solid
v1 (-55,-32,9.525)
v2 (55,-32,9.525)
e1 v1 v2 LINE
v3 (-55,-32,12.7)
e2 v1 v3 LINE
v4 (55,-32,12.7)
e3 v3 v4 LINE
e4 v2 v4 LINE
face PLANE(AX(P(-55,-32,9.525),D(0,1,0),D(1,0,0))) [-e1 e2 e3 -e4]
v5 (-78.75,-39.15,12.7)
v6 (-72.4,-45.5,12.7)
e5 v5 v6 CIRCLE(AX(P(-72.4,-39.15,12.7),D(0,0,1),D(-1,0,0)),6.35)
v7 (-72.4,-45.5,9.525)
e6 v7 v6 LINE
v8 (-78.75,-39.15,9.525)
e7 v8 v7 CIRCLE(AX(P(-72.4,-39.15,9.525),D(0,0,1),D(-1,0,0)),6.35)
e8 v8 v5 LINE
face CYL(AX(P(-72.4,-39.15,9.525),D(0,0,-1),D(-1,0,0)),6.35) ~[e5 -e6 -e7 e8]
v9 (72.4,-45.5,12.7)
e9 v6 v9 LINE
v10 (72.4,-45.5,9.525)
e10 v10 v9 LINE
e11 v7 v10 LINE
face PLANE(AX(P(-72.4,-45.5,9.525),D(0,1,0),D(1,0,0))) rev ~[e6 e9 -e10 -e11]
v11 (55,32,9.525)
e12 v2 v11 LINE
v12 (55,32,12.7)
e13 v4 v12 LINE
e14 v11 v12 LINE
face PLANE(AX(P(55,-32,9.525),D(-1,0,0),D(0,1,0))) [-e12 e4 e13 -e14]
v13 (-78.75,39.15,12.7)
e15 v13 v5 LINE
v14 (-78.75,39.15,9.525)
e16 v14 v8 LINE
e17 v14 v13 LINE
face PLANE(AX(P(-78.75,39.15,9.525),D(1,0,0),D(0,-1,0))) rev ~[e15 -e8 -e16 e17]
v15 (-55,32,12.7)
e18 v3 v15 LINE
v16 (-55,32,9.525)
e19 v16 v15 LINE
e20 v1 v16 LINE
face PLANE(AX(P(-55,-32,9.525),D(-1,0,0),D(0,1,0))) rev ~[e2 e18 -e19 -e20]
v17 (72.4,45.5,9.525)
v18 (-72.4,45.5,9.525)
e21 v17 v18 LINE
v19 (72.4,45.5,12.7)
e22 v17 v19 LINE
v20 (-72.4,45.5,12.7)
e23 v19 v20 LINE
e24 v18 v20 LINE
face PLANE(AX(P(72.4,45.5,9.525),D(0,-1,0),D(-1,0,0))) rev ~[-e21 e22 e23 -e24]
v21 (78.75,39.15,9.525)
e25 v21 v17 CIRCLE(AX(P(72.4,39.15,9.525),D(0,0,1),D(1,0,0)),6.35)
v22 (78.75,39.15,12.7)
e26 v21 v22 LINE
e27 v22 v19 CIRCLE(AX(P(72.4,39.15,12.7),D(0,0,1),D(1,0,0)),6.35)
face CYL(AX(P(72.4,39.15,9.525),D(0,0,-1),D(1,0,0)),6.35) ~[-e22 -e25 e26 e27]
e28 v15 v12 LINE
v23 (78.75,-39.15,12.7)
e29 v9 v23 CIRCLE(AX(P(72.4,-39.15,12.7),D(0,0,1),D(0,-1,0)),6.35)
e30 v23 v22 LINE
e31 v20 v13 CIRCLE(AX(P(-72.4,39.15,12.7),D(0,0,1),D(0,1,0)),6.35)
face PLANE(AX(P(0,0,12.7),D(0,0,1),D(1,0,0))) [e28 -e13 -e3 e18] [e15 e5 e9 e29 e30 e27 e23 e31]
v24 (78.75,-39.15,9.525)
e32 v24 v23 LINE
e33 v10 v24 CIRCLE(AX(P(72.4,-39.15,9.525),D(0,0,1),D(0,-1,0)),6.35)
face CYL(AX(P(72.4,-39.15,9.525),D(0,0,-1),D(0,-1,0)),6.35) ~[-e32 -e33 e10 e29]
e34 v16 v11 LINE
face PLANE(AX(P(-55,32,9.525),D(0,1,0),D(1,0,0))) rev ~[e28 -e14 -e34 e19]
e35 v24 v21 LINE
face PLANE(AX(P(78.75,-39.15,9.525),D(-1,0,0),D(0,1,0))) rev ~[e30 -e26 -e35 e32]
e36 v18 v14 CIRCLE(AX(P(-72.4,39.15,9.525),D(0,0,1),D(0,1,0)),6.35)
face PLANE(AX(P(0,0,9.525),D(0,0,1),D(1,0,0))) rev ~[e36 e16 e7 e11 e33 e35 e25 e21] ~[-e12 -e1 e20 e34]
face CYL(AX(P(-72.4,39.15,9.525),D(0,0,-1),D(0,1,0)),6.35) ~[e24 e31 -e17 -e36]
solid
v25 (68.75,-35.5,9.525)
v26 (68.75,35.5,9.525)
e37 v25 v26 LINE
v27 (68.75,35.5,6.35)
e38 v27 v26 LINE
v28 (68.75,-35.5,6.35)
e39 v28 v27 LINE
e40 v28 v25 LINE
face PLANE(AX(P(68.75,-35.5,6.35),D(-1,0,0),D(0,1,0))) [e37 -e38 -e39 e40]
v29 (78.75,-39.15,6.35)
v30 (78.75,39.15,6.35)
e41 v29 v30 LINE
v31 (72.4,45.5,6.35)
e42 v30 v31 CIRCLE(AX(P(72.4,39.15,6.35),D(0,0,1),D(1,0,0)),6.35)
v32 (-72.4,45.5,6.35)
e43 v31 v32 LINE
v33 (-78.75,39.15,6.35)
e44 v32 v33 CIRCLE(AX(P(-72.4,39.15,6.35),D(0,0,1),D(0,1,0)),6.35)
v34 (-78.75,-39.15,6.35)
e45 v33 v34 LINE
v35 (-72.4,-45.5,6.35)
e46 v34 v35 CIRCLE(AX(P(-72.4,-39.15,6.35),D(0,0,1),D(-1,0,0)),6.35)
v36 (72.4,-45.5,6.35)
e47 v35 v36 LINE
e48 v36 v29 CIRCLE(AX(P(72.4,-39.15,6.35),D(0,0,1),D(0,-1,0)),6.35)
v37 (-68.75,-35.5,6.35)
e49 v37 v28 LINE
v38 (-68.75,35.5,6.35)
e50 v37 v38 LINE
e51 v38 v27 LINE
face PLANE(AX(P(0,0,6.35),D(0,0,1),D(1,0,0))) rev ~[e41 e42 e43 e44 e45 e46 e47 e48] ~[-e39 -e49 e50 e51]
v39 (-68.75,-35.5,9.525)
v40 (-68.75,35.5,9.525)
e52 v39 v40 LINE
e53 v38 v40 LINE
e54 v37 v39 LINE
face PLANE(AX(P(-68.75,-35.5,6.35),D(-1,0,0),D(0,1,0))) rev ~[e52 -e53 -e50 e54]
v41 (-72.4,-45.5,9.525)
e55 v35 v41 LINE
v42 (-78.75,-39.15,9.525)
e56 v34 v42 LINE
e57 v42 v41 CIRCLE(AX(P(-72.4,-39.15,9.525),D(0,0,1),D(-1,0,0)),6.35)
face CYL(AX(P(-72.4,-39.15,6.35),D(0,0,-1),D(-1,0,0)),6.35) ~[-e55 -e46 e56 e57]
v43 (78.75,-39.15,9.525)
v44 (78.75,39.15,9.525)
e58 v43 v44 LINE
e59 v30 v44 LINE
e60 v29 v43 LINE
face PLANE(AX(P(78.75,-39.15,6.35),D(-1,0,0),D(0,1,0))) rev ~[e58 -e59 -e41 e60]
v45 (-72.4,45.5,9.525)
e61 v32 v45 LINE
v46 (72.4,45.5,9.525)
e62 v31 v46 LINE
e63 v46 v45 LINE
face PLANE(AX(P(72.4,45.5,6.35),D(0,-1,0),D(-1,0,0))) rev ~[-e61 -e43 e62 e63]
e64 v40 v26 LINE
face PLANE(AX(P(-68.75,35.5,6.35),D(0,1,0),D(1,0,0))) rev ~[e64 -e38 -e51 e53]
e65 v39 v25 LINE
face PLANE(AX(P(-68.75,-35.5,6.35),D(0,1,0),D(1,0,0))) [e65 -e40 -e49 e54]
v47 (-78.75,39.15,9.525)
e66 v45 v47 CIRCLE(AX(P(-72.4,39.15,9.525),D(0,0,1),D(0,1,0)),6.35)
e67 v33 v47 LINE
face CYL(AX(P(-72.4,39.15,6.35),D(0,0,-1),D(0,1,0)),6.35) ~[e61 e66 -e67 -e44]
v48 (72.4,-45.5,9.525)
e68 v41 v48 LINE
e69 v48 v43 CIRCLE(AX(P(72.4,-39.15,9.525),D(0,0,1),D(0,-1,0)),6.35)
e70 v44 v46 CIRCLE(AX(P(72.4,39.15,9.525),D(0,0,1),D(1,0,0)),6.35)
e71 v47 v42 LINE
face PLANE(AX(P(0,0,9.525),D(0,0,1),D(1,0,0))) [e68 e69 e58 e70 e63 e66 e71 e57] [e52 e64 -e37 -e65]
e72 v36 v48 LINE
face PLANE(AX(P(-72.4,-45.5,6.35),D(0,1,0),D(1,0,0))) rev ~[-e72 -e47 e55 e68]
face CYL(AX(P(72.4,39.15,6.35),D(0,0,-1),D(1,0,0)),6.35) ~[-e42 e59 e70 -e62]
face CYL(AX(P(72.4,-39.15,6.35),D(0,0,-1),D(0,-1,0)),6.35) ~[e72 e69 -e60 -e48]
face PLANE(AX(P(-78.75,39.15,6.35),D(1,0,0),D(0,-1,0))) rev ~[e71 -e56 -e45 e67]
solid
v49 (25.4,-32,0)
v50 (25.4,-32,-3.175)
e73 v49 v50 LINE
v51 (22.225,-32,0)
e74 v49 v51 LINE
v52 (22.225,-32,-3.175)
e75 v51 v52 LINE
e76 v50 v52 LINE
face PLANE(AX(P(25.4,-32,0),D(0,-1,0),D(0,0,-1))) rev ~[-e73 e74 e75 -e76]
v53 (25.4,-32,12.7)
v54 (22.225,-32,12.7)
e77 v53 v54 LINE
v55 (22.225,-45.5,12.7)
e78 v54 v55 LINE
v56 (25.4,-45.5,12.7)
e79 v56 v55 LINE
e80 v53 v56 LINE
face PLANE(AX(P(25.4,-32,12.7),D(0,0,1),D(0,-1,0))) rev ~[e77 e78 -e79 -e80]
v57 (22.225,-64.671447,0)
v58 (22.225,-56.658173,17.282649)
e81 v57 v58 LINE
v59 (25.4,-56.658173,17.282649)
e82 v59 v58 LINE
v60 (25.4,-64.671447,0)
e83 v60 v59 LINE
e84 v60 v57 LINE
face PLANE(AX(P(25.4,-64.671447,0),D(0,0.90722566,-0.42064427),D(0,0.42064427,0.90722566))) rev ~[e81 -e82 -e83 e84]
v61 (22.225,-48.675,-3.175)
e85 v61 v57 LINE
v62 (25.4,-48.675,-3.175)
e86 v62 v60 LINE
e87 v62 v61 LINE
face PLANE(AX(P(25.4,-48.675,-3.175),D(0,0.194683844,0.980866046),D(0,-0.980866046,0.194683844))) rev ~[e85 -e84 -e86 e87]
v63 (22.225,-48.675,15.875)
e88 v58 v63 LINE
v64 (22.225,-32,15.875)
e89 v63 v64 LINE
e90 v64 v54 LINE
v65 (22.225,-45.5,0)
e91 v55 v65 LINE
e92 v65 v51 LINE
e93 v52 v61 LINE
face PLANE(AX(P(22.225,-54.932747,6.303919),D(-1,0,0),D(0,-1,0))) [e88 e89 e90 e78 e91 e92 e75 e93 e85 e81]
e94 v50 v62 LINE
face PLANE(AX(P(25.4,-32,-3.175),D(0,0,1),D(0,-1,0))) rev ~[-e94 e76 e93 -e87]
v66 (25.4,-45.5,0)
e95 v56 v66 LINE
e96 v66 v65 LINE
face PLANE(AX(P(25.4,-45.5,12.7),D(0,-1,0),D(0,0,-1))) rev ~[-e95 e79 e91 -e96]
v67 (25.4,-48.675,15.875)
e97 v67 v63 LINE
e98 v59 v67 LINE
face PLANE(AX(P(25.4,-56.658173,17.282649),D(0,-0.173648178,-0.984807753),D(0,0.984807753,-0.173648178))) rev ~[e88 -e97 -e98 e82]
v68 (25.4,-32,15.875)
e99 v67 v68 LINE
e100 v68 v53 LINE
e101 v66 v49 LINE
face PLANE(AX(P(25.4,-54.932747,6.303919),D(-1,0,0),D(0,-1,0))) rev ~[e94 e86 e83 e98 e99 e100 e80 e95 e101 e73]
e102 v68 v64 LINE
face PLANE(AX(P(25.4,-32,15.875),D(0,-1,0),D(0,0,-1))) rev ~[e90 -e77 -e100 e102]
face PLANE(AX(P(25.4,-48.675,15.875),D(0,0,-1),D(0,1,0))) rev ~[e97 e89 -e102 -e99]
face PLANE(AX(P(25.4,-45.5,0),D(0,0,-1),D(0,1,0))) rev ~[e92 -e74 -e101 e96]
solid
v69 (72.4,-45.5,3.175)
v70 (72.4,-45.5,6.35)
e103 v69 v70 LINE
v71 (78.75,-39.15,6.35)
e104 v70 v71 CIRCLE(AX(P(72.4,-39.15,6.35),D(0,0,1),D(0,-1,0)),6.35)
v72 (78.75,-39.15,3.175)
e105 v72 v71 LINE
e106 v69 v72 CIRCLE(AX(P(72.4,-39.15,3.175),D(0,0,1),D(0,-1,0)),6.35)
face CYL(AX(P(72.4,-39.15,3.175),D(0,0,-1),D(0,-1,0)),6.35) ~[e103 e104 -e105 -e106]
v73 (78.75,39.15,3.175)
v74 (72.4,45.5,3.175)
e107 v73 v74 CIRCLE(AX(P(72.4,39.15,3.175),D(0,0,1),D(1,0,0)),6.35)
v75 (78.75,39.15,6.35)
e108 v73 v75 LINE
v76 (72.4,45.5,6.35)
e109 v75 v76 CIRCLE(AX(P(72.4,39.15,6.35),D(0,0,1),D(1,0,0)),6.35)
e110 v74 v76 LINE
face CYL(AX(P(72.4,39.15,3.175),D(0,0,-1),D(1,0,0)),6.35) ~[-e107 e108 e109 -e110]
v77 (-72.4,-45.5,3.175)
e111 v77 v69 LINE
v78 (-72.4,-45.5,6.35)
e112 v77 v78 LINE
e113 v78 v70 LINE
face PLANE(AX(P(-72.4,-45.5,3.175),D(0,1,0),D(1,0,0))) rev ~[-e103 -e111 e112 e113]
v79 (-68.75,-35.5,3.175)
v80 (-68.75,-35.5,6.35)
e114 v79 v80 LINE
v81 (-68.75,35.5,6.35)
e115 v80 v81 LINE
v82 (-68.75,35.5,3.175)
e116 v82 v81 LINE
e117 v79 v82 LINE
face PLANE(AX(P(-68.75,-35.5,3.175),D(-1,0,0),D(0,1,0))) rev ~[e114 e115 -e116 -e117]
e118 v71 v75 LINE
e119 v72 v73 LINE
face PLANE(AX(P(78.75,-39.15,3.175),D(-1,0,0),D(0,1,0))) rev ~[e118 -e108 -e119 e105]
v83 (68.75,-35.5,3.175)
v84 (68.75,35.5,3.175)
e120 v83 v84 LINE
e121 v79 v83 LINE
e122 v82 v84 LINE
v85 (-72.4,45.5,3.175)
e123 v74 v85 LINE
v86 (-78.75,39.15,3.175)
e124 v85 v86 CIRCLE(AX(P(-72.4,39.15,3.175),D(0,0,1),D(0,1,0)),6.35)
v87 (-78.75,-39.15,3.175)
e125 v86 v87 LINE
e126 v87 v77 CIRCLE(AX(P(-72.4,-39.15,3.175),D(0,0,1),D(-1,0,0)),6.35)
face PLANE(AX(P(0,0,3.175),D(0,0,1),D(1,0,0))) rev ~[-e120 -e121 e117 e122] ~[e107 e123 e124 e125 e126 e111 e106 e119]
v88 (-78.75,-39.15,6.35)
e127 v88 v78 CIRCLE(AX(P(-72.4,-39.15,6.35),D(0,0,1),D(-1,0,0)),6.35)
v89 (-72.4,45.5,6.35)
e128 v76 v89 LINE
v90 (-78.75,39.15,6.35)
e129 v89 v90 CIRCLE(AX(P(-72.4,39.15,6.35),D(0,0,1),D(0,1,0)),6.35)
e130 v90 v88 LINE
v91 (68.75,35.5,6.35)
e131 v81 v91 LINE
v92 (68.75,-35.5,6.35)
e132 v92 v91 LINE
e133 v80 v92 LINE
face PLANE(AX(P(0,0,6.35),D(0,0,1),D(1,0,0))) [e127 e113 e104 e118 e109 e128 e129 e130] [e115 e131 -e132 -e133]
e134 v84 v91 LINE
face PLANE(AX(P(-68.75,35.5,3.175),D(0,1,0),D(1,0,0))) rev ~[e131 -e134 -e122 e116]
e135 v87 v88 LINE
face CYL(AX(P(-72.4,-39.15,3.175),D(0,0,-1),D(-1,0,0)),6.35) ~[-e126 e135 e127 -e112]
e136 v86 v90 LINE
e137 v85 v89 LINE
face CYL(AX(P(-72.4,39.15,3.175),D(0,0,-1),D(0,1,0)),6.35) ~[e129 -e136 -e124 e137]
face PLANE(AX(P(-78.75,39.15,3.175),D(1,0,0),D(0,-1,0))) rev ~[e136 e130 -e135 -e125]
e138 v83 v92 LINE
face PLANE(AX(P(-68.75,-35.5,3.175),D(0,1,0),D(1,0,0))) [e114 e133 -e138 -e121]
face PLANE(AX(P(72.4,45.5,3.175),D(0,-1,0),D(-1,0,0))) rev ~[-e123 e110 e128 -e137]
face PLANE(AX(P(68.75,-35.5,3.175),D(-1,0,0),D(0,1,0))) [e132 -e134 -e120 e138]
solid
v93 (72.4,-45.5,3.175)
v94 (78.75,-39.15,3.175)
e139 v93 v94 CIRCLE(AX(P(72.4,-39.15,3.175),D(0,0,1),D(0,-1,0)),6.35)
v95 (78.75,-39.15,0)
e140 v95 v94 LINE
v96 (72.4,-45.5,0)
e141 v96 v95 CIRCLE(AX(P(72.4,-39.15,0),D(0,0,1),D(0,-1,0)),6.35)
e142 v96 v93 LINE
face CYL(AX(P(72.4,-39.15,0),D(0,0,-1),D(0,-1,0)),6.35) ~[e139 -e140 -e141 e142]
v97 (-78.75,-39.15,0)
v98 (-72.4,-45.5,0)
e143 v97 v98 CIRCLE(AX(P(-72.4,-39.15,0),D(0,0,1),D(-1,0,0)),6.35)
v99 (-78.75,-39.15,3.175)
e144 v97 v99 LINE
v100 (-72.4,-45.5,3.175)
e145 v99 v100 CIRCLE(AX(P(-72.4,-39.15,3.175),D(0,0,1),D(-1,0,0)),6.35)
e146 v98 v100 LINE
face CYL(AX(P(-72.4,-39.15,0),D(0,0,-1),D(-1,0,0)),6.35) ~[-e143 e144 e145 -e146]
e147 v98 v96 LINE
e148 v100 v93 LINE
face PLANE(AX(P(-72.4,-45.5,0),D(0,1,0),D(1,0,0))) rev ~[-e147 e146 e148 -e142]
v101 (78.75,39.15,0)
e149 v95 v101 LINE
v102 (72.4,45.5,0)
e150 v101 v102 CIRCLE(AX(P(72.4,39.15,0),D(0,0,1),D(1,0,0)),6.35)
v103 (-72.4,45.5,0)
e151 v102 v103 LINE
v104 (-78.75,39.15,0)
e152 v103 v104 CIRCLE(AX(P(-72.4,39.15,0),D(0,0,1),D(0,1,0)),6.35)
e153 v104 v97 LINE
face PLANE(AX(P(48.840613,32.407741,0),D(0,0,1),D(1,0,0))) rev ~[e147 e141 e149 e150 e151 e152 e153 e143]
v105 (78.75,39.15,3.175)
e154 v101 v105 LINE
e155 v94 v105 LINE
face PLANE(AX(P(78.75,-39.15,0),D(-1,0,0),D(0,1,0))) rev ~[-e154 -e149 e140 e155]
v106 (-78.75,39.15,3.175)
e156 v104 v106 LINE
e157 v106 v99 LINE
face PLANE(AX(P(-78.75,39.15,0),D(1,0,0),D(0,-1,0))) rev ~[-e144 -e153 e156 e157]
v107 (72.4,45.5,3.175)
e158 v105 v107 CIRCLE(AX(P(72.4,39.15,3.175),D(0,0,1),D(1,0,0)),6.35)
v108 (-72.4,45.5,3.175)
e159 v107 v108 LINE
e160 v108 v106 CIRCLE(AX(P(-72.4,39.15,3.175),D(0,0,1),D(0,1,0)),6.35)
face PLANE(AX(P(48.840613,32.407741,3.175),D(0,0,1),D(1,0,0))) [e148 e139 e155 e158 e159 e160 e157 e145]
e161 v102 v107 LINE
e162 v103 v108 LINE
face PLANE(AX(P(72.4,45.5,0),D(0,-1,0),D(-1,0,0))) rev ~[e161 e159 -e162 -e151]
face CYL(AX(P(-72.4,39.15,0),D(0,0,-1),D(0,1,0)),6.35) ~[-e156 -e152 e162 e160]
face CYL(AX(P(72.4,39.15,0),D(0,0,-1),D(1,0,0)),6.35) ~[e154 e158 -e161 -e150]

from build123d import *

# Parameters (mm, degrees)
F0_W      = 110
F0_H      = 64
F1_DEPTH  = 3.175
F2_W      = 137.5
F2_H      = 71
F3_DEPTH  = 3.175
F4_W      = 137.5
F4_H      = 71
F5_DEPTH  = 3.175
F6_W      = 110
F6_H      = 64
F7_DEPTH  = 3.175
F13_DEPTH = 3.175


# Not quite as in the source:
# - a length typed as a fraction of an inch, garbled in the dataset ("3 / 203.2 mm" for 3/8 in), is restored


with BuildPart() as f1:
    # F0 (on Top) → F1 (new body)
    with BuildSketch(Plane.XY):
        with BuildLine():
            Line((0, 35.5), (68.75, 35.5))
            Line((68.75, 35.5), (68.75, 0))
            Line((68.75, 0), (78.75, 0))
            Line((78.75, 0), (78.75, 39.15))
            ThreePointArc((78.75, 39.15), (76.8901280605, 43.6401280605), (72.4, 45.5))
            Line((72.4, 45.5), (0, 45.5))
            Line((0, 45.5), (0, 35.5))
        make_face()
        with BuildLine():
            Line((-68.75, 35.5), (0, 35.5))
            Line((0, 35.5), (0, 45.5))
            Line((0, 45.5), (-72.4, 45.5))
            ThreePointArc((-72.4, 45.5), (-76.8901280605, 43.6401280605), (-78.75, 39.15))
            Line((-78.75, 39.15), (-78.75, 0))
            Line((-78.75, 0), (-68.75, 0))
            Line((-68.75, 0), (-68.75, 35.5))
        make_face()
        with BuildLine():
            Line((78.75, 0), (68.75, 0))
            Line((68.75, 0), (68.75, -35.5))
            Line((68.75, -35.5), (0, -35.5))
            Line((0, -35.5), (0, -45.5))
            Line((0, -45.5), (72.4, -45.5))
            ThreePointArc((72.4, -45.5), (76.8901280605, -43.6401280605), (78.75, -39.15))
            Line((78.75, -39.15), (78.75, 0))
        make_face()
        with BuildLine():
            Line((-68.75, -35.5), (-68.75, 0))
            Line((-68.75, 0), (-78.75, 0))
            Line((-78.75, 0), (-78.75, -39.15))
            ThreePointArc((-78.75, -39.15), (-76.8901280605, -43.6401280605), (-72.4, -45.5))
            Line((-72.4, -45.5), (0, -45.5))
            Line((0, -45.5), (0, -35.5))
            Line((0, -35.5), (-68.75, -35.5))
        make_face()
        Polygon((68.75, 0), (68.75, 35.5), (0, 35.5), (-68.75, 35.5), (-68.75, 0), (-68.75, -35.5), (0, -35.5), (68.75, -35.5), align=None)
        Rectangle(F0_W, F0_H, mode=Mode.SUBTRACT)
        Rectangle(F0_W, F0_H)
    extrude(amount=F1_DEPTH)


with BuildPart() as f3:
    # F2 (on face) → F3 (new body)
    with BuildSketch(Plane.XY.offset(3.175)):
        with BuildLine():
            Line((-72.4, -45.5), (72.4, -45.5))
            ThreePointArc((72.4, -45.5), (76.8901280605, -43.6401280605), (78.75, -39.15))
            Line((78.75, -39.15), (78.75, 39.15))
            ThreePointArc((78.75, 39.15), (76.8901280605, 43.6401280605), (72.4, 45.5))
            Line((72.4, 45.5), (-72.4, 45.5))
            ThreePointArc((-72.4, 45.5), (-76.8901280605, 43.6401280605), (-78.75, 39.15))
            Line((-78.75, 39.15), (-78.75, -39.15))
            ThreePointArc((-78.75, -39.15), (-76.8901280605, -43.6401280605), (-72.4, -45.5))
        make_face()
        Rectangle(F2_W, F2_H, mode=Mode.SUBTRACT)
    extrude(amount=F3_DEPTH)


with BuildPart() as f5:
    # F4 (on face) → F5 (new body)
    with BuildSketch(Plane.XY.offset(6.35)):
        with BuildLine():
            ThreePointArc((-78.75, -39.15), (-76.8901280605, -43.6401280605), (-72.4, -45.5))
            Line((-72.4, -45.5), (72.4, -45.5))
            ThreePointArc((72.4, -45.5), (76.8901280605, -43.6401280605), (78.75, -39.15))
            Line((78.75, -39.15), (78.75, 39.15))
            ThreePointArc((78.75, 39.15), (76.8901280605, 43.6401280605), (72.4, 45.5))
            Line((72.4, 45.5), (-72.4, 45.5))
            ThreePointArc((-72.4, 45.5), (-76.8901280605, 43.6401280605), (-78.75, 39.15))
            Line((-78.75, 39.15), (-78.75, -39.15))
        make_face()
        Rectangle(F4_W, F4_H, mode=Mode.SUBTRACT)
    extrude(amount=F5_DEPTH)


with BuildPart() as f7:
    # F6 (on face) → F7 (new body)
    with BuildSketch(Plane.XY.offset(9.525)):
        with BuildLine():
            Line((-72.4, -45.5), (72.4, -45.5))
            ThreePointArc((72.4, -45.5), (76.8901280605, -43.6401280605), (78.75, -39.15))
            Line((78.75, -39.15), (78.75, 39.15))
            ThreePointArc((78.75, 39.15), (76.8901280605, 43.6401280605), (72.4, 45.5))
            Line((72.4, 45.5), (-72.4, 45.5))
            ThreePointArc((-72.4, 45.5), (-76.8901280605, 43.6401280605), (-78.75, 39.15))
            Line((-78.75, 39.15), (-78.75, -39.15))
            ThreePointArc((-78.75, -39.15), (-76.8901280605, -43.6401280605), (-72.4, -45.5))
        make_face()
        Rectangle(F6_W, F6_H, mode=Mode.SUBTRACT)
    extrude(amount=F7_DEPTH)


with BuildPart() as f13:
    # F12 (on line) → F13 (new body)
    with BuildSketch(Plane(origin=(25.4, 0, 0), x_dir=(0, -1, 0), z_dir=(-1, 0, 0))):
        Polygon((56.6581731759, 17.2826488226), (48.675, 15.875), (48.675, -3.175), (64.6714465192, 0), align=None)
        Polygon((48.675, -3.175), (48.675, 15.875), (32, 15.875), (32, 12.7), (45.5, 12.7), (45.5, 0), (32, 0), (32, -3.175), align=None)
    extrude(amount=F13_DEPTH)


solid = Compound([f1.part, f3.part, f5.part, f7.part, f13.part])
